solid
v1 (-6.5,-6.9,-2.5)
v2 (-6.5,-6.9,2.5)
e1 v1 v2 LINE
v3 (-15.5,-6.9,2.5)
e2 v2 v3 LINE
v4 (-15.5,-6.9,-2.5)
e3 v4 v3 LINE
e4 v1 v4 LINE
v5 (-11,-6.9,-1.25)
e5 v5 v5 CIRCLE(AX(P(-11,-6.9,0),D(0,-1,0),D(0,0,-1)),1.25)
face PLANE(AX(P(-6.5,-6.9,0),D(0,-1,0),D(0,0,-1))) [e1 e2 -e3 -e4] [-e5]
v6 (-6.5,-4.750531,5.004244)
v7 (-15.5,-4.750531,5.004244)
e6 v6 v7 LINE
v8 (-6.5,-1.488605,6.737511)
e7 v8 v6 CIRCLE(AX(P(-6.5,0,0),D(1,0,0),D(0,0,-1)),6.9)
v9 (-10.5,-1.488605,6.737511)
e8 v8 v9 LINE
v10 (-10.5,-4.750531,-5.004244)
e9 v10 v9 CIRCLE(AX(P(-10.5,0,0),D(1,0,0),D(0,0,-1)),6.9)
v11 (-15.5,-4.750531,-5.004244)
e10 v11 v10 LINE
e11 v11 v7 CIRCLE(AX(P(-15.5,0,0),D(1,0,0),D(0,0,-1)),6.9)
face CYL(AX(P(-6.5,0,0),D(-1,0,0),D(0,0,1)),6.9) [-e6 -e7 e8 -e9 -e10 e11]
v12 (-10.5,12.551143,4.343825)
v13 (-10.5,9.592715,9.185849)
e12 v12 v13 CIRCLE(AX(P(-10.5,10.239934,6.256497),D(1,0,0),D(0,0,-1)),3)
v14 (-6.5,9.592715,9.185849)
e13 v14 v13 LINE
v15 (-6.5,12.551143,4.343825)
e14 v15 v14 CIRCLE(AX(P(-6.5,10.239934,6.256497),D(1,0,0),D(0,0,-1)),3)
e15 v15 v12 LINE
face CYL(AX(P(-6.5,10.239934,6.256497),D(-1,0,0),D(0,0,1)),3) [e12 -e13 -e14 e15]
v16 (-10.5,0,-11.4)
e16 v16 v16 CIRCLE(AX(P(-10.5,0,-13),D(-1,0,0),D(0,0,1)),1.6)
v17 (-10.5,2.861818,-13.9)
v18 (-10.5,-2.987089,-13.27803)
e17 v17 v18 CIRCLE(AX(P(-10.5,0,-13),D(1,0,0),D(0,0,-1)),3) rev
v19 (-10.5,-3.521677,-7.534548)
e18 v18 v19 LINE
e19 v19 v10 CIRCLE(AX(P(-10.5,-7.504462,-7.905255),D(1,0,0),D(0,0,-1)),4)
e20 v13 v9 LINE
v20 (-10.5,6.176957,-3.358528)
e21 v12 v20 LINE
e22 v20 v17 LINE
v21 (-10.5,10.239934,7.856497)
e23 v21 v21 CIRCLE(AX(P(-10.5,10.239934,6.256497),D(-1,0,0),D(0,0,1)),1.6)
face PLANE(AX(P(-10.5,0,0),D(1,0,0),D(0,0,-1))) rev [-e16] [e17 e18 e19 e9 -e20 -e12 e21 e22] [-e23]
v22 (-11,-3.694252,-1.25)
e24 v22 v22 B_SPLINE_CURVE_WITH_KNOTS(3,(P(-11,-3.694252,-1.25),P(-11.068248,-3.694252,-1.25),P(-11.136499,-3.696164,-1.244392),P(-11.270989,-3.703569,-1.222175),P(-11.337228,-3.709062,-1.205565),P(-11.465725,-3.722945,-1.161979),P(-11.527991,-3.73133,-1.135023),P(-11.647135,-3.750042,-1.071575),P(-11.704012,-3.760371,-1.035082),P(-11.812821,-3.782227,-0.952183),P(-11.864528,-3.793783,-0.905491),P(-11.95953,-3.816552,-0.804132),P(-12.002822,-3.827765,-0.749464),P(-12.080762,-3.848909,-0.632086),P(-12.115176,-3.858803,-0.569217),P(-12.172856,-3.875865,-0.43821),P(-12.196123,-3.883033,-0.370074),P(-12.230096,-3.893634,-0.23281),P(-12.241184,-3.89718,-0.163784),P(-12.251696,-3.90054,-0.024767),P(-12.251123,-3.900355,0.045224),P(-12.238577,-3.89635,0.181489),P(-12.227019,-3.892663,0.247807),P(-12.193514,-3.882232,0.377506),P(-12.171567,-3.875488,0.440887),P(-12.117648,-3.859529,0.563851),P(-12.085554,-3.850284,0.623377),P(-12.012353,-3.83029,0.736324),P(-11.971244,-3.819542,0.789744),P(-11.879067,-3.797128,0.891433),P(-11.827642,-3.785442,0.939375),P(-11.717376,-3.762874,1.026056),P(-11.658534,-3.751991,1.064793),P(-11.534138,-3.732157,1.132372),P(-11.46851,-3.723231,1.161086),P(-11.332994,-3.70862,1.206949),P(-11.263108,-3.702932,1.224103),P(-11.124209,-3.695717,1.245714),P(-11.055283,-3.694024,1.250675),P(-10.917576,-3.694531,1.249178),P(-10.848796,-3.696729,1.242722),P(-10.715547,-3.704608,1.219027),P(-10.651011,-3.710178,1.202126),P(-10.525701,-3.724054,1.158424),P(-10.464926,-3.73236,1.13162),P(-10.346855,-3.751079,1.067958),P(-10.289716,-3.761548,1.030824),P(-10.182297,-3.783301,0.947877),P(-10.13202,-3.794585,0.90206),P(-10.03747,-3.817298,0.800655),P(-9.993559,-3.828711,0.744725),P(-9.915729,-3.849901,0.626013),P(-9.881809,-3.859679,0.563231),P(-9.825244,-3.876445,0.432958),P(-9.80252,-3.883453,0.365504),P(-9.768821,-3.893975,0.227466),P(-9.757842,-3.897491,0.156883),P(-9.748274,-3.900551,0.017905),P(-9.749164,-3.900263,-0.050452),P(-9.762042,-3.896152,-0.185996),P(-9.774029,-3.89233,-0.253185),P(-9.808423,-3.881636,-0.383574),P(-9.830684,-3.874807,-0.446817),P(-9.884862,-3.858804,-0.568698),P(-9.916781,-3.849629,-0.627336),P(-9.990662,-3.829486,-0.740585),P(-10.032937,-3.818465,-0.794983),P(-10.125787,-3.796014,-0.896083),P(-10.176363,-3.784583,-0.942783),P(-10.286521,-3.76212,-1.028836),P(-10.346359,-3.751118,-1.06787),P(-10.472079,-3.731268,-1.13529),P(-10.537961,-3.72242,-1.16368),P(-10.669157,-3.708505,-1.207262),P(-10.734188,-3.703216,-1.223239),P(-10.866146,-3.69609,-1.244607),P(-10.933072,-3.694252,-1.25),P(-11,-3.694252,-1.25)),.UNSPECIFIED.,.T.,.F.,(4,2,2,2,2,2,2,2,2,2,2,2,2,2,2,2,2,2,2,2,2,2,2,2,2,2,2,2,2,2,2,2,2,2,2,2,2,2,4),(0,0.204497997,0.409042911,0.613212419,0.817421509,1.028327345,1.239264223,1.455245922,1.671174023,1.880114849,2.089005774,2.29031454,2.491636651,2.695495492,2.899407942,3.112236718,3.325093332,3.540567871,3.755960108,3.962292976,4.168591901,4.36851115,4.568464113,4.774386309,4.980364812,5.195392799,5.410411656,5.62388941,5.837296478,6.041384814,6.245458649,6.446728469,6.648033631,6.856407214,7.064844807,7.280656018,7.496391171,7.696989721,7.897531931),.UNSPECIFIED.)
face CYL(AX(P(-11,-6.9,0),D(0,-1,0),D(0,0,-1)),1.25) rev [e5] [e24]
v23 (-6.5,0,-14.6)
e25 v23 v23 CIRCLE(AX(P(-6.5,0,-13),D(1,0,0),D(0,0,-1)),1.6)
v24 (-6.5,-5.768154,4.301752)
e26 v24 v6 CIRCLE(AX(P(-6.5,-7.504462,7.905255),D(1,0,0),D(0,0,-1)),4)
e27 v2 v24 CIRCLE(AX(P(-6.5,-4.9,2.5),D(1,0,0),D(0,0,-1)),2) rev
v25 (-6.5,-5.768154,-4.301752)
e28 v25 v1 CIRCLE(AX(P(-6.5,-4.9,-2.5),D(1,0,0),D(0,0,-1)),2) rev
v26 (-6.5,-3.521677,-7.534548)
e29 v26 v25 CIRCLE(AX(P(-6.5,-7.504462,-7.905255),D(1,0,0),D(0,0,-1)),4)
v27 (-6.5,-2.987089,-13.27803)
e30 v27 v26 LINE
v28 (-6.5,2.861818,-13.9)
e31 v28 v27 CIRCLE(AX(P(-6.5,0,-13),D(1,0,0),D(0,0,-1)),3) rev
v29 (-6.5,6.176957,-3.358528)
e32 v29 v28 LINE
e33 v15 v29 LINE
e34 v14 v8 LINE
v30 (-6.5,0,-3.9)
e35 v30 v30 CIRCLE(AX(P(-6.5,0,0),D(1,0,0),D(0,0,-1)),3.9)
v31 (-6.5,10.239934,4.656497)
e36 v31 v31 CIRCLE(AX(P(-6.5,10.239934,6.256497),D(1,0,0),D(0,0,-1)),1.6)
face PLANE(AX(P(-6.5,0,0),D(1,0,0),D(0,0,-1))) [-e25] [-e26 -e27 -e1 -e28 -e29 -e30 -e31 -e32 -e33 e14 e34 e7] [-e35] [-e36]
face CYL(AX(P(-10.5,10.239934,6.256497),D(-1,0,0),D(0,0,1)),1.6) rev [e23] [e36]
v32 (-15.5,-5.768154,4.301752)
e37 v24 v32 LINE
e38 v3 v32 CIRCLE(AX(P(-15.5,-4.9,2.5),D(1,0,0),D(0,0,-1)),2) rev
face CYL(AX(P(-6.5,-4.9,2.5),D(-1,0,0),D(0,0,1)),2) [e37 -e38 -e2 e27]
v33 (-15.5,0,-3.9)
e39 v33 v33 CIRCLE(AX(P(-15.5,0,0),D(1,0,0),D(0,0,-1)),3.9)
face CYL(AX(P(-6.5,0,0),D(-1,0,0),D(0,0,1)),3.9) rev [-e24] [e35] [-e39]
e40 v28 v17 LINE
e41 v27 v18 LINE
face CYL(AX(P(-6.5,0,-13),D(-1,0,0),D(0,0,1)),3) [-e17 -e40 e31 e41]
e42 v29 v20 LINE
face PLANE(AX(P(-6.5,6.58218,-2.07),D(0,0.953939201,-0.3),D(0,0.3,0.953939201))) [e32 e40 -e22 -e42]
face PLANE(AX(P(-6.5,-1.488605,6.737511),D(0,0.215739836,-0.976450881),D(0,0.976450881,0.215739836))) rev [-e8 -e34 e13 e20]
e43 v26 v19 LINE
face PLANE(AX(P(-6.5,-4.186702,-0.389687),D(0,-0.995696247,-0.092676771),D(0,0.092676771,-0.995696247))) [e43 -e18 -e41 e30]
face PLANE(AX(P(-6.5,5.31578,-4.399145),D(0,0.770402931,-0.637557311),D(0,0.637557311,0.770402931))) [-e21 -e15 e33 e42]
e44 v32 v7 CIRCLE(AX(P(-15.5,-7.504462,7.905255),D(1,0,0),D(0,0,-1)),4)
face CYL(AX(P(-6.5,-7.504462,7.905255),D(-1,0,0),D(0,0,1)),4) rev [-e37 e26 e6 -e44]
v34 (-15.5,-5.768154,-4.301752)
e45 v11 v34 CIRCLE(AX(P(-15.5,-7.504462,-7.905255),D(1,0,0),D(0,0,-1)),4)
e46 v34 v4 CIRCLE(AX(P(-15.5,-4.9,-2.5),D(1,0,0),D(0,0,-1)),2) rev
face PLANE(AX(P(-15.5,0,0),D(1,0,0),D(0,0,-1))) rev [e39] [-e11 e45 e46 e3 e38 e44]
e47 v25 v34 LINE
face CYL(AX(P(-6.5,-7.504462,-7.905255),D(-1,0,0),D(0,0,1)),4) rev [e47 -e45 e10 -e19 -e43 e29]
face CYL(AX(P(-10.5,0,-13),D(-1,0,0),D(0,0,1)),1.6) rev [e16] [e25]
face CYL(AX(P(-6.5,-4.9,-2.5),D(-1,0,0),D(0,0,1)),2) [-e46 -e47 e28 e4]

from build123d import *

# Parameters (mm, degrees)
BOSS_EXTRUDE1_START     = -10.5
SKETCH2_R               = 3.9
BOSS_EXTRUDE1_DEPTH     = 4
BOSS_EXTRUDE2_START     = -15.5
BOSS_EXTRUDE2_OUTLINE_R = 3.9
BOSS_EXTRUDE2_DEPTH     = 5
M3_CLEARANCE_HOLE1_D    = 3.2
M3_TAPPED_HOLE1_REACH   = 32.031
M3_TAPPED_HOLE1_BORE_R  = 1.25


# Read off the part's stored shape, not the designer's step: Boss-Extrude2
with BuildPart() as part:
    # Sketch2 → Boss-Extrude1 (new body)
    with BuildSketch(Plane(origin=(0, 0, 0), x_dir=(0, 0, -1), z_dir=(1, 0, 0)).offset(BOSS_EXTRUDE1_START)):
        with BuildLine():
            Line((7.534547605, -3.521676906), (13.278030312, -2.987088741))
            ThreePointArc((13.278030312, -2.987088741), (15.983180385, -0.317229866), (13.9, 2.861817604))
            Line((13.9, 2.861817604), (3.358528015, 6.176957176))
            Line((3.358528015, 6.176957176), (-4.343824749, 12.551142838))
            ThreePointArc((-4.343824749, 12.551142838), (-7.820620852, 12.799917558), (-9.185849324, 9.592714537))
            Line((-9.185849324, 9.592714537), (-6.737511079, -1.488604871))
            ThreePointArc((-6.737511079, -1.488604871), (-6.093212803, -3.237708717), (-5.004243793, -4.750530924))
            ThreePointArc((-5.004243793, -4.750530924), (-4.613436828, -5.232032538), (-4.301751563, -5.768153965))
            ThreePointArc((-4.301751563, -5.768153965), (-3.563882529, -6.593562507), (-2.5, -6.9))
            Line((-2.5, -6.9), (2.5, -6.9))
            ThreePointArc((2.5, -6.9), (3.563882529, -6.593562507), (4.301751563, -5.768153965))
            ThreePointArc((4.301751563, -5.768153965), (5.622657157, -4.219686633), (7.534547605, -3.521676906))
        make_face()
        Circle(SKETCH2_R, mode=Mode.SUBTRACT)
    extrude(amount=BOSS_EXTRUDE1_DEPTH)

    # Boss-Extrude2 outline → Boss-Extrude2 (add)
    with BuildSketch(Plane(origin=(0, 0, 0), x_dir=(0, 0, -1), z_dir=(1, 0, 0)).offset(BOSS_EXTRUDE2_START)):
        with BuildLine():
            ThreePointArc((5.004243793, -4.750530924), (0, 6.9), (-5.004243793, -4.750530924))
            ThreePointArc((-5.004243793, -4.750530924), (-4.613436828, -5.232032538), (-4.301751563, -5.768153965))
            ThreePointArc((-4.301751563, -5.768153965), (-3.563882529, -6.593562507), (-2.5, -6.9))
            Line((-2.5, -6.9), (2.5, -6.9))
            ThreePointArc((2.5, -6.9), (3.563882529, -6.593562507), (4.301751563, -5.768153965))
            ThreePointArc((4.301751563, -5.768153965), (4.613436828, -5.232032538), (5.004243793, -4.750530924))
        make_face()
        Circle(BOSS_EXTRUDE2_OUTLINE_R, mode=Mode.SUBTRACT)
    extrude(amount=BOSS_EXTRUDE2_DEPTH)

    # M3 Clearance Hole1 (through all)
    with Locations(Plane.ZY.offset(10.5)):
        with Locations((-13, 0), (6.256496681, 10.239934047)):
            Hole(M3_CLEARANCE_HOLE1_D / 2)

    # M3 Tapped Hole1 bore → M3 Tapped Hole1 (cut, up to next)
    with BuildSketch(Plane(origin=(0, -6.9, 0), x_dir=(-1, 0, 0), z_dir=(0, -1, 0)), mode=Mode.PRIVATE) as m3_tapped_hole1_sk1:
        with Locations((11, 0)):
            Circle(M3_TAPPED_HOLE1_BORE_R)
    m3_tapped_hole1_tool1 = extrude(m3_tapped_hole1_sk1.sketch, amount=-M3_TAPPED_HOLE1_REACH, mode=Mode.PRIVATE) & part.part
    add(m3_tapped_hole1_tool1.solids().sort_by_distance((-11, -6.9, 0))[0], mode=Mode.SUBTRACT)


solid = part.part
